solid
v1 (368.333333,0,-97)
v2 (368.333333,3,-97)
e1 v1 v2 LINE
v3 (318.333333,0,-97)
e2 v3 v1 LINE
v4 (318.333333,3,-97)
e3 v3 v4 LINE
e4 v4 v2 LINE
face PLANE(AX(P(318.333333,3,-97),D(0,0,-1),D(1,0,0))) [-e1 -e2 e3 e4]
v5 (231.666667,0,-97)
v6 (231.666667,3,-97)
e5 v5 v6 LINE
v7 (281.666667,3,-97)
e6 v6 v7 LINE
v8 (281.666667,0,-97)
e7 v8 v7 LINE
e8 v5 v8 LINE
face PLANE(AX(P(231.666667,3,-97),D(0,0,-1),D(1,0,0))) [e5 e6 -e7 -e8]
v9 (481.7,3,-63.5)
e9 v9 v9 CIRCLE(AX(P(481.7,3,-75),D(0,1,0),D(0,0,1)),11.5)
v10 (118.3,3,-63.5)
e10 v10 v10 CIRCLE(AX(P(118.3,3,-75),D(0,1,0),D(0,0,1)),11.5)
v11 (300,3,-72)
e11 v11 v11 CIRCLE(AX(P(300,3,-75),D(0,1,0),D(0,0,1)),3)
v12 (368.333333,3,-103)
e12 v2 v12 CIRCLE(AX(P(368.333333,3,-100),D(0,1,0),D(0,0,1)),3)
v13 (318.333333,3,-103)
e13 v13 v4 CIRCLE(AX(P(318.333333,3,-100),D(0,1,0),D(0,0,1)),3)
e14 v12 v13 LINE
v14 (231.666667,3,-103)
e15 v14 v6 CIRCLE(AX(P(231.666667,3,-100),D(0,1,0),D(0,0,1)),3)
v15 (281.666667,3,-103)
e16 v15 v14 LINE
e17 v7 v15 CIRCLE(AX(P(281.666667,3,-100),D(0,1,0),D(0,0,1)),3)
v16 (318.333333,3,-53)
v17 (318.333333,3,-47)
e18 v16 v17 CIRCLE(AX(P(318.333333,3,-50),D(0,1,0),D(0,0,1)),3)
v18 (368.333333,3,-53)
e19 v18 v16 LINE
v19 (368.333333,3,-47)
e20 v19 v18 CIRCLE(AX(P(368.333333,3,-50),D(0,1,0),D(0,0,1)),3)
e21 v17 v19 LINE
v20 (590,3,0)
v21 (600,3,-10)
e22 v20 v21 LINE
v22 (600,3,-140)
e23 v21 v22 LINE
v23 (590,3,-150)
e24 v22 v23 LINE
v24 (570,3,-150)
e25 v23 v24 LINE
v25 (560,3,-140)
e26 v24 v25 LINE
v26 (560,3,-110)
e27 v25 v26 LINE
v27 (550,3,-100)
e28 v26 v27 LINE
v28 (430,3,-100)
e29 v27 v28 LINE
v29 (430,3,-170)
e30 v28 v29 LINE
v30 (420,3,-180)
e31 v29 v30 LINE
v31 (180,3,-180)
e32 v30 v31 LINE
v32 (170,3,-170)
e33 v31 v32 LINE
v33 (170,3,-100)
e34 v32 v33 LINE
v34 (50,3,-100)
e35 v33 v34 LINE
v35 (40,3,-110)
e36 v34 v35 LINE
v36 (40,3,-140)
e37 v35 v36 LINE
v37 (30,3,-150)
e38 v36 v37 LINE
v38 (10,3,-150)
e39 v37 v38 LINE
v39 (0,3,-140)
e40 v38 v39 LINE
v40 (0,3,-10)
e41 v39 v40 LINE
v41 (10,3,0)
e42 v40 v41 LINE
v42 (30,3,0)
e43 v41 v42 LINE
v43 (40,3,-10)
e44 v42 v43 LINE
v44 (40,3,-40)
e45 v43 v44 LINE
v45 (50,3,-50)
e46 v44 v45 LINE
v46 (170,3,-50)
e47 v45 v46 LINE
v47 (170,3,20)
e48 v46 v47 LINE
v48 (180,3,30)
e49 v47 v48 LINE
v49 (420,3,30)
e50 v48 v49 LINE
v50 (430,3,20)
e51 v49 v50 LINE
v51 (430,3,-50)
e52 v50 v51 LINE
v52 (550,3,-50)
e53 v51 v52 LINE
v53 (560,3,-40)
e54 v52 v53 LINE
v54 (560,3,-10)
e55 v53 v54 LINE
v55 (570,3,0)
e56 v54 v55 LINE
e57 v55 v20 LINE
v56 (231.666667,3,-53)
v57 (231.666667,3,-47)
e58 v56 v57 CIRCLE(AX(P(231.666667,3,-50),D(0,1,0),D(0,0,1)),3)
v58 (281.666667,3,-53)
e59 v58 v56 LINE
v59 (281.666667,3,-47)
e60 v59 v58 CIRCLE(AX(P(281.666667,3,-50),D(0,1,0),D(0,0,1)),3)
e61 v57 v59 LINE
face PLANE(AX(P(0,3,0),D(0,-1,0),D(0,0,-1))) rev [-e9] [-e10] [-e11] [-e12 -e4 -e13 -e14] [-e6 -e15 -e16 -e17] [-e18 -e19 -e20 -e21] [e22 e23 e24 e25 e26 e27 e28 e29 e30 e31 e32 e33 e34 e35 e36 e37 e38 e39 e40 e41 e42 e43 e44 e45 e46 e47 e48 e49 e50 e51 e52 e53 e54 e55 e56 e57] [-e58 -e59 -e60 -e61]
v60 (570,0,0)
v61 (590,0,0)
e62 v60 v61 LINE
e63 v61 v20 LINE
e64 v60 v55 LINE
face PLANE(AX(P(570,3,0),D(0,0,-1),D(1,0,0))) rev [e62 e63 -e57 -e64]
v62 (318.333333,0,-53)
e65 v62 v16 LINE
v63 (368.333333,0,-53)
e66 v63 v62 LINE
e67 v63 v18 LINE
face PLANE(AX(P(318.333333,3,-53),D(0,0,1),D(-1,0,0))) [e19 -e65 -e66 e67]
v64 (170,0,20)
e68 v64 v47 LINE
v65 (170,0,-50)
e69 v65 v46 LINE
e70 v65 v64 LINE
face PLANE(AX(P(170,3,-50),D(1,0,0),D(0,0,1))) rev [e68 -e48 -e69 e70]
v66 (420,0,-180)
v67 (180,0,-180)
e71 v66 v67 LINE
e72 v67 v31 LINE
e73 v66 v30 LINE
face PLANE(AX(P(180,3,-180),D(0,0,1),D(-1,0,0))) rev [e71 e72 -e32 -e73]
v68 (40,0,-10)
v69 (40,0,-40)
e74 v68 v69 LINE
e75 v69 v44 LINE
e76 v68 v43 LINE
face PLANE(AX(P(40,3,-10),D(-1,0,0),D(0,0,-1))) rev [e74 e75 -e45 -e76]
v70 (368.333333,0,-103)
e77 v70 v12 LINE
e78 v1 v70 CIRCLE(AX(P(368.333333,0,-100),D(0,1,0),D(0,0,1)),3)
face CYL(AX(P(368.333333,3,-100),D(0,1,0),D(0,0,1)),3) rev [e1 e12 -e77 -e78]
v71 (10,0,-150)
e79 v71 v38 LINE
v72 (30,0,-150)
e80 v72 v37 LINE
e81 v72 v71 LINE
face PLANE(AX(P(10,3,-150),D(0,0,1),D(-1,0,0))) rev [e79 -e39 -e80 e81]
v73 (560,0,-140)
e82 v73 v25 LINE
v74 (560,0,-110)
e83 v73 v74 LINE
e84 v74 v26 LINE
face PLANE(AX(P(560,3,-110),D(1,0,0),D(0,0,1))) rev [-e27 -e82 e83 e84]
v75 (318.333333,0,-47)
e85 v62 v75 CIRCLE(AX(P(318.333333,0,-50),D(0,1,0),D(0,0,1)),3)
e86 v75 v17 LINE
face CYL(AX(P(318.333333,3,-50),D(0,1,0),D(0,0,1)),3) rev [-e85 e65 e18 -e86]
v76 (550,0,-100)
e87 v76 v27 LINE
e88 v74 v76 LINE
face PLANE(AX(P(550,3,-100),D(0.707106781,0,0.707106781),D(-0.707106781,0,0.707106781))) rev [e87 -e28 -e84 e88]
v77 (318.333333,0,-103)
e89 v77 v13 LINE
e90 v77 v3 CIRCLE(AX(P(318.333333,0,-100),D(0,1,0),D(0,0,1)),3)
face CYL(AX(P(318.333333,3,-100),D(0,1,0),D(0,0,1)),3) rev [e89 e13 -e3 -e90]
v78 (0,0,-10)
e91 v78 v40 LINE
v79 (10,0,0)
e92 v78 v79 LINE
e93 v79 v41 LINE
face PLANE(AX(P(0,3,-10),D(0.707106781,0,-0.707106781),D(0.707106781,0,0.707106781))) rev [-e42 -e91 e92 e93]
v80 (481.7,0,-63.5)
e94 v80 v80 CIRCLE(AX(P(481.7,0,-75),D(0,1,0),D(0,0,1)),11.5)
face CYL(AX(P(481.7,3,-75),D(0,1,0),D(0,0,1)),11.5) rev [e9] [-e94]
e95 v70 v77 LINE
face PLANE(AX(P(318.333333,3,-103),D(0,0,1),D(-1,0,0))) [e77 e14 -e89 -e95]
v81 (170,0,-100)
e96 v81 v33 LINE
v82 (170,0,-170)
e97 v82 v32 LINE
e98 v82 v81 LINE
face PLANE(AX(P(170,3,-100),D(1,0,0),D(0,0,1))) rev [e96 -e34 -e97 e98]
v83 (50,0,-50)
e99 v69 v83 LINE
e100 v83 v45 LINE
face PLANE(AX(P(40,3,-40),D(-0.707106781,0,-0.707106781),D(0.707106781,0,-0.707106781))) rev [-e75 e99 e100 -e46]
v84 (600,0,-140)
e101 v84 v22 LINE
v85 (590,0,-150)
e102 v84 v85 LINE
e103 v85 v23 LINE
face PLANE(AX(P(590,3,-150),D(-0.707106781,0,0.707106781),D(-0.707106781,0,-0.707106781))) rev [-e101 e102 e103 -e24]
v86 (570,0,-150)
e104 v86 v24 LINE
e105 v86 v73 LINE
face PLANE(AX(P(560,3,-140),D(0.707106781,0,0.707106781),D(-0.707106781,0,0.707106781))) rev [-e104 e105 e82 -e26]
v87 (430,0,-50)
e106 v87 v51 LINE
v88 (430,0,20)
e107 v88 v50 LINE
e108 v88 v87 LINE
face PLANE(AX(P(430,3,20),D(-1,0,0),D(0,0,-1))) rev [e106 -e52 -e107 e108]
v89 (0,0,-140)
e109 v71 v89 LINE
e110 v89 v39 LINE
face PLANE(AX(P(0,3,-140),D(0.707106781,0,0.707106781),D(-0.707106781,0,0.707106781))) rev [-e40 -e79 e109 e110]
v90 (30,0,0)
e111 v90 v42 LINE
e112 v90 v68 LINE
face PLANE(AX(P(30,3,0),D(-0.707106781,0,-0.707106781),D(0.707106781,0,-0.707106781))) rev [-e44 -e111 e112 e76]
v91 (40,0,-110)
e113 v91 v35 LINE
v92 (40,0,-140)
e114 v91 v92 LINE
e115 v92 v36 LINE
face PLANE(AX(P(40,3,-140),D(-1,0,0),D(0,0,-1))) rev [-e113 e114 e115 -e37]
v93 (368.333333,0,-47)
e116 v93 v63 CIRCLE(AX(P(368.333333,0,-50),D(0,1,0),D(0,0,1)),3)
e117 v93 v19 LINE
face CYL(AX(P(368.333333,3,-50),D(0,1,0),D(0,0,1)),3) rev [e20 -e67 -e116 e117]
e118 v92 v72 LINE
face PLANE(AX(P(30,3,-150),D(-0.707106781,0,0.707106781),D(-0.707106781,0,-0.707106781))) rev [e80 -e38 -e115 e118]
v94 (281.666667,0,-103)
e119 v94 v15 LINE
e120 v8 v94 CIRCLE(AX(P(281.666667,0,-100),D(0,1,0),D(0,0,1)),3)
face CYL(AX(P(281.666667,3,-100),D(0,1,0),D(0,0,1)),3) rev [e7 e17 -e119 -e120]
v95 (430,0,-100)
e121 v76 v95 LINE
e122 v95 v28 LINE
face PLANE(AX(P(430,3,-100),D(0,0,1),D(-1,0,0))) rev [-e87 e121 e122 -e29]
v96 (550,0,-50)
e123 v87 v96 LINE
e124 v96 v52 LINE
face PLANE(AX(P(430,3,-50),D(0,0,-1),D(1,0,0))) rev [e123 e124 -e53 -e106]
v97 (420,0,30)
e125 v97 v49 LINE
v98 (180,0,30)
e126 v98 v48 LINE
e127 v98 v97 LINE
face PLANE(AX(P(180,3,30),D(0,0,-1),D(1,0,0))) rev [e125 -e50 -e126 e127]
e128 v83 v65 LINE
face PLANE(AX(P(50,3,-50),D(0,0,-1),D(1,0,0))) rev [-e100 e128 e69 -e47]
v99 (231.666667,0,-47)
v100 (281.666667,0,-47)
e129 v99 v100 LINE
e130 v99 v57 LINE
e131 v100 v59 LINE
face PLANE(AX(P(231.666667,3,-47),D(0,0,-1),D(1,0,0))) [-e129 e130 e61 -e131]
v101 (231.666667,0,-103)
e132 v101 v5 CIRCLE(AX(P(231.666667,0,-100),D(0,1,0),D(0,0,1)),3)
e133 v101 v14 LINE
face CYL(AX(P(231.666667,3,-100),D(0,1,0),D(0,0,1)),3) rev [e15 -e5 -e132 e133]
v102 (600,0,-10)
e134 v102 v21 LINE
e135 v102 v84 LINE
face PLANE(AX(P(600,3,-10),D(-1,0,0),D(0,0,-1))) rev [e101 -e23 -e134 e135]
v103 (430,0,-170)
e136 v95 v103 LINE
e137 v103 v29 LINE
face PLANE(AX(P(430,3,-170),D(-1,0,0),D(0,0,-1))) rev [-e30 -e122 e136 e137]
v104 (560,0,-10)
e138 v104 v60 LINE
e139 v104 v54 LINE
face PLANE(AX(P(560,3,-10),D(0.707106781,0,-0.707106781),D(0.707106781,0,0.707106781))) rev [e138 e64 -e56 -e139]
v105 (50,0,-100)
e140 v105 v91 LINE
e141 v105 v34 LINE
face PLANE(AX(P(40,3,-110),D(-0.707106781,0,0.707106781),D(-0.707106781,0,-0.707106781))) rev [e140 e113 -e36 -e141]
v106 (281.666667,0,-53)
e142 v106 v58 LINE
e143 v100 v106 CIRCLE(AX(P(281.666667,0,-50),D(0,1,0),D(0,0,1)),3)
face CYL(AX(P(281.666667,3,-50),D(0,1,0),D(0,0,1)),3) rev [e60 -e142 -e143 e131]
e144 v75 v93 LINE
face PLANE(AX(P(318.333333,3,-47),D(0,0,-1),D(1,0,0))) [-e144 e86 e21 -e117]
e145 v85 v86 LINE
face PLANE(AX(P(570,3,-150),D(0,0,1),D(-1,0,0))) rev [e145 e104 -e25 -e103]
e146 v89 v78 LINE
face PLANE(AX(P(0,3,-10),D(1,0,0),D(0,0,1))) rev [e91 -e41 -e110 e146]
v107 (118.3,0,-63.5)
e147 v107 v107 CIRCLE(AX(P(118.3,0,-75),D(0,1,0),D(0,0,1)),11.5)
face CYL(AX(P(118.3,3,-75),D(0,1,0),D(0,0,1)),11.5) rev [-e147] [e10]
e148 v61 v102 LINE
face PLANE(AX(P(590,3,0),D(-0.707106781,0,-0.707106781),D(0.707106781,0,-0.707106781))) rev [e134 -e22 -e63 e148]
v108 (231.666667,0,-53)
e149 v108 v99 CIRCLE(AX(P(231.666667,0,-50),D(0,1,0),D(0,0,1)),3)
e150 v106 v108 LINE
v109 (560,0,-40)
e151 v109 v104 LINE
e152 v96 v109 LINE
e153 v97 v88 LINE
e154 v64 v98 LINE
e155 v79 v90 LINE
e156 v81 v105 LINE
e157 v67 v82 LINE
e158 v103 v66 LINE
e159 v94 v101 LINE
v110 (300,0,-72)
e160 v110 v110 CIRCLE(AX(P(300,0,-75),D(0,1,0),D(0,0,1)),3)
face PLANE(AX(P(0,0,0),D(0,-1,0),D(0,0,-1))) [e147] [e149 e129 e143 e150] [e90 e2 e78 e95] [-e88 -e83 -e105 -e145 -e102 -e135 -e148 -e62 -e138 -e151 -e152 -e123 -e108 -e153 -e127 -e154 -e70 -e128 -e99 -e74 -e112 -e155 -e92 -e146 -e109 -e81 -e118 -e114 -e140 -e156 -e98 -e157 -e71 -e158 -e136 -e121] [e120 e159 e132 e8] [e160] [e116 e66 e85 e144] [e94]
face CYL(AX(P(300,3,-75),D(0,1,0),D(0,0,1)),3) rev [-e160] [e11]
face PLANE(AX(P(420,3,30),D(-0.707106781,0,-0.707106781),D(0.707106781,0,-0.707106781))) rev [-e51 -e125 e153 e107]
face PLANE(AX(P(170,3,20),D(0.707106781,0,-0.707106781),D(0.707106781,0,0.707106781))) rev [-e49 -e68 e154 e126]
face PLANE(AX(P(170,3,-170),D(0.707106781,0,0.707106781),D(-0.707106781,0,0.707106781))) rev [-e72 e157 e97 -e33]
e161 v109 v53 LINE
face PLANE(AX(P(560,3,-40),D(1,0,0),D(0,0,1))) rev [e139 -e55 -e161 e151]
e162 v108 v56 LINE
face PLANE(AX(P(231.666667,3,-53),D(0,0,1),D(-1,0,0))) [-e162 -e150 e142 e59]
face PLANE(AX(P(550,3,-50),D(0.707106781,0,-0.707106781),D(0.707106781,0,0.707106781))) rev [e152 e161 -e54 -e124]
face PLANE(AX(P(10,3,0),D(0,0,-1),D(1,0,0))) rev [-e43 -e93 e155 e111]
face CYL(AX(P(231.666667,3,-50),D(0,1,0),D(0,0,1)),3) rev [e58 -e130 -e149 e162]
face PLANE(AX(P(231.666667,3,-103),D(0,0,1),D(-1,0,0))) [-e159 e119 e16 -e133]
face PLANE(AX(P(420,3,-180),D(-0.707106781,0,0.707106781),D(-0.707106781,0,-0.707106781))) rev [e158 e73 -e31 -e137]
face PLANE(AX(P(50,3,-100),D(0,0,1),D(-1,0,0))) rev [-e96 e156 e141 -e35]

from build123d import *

# Parameters (mm, degrees)
SKETCH1_R           = 11.5
SKETCH1_R_2         = 3
BOSS_EXTRUDE1_DEPTH = 3


with BuildPart() as part:
    # Sketch1 → Boss-Extrude1 (new body)
    with BuildSketch(Plane(origin=(0, 0, 0), x_dir=(1, 0, 0), z_dir=(0, 1, 0))):
        Polygon((10, 150), (30, 150), (40, 140), (40, 110), (50, 100), (170, 100), (170, 170), (180, 180), (420, 180), (430, 170), (430, 100), (550, 100), (560, 110), (560, 140), (570, 150), (590, 150), (600, 140), (600, 10), (590, 0), (570, 0), (560, 10), (560, 40), (550, 50), (430, 50), (430, -20), (420, -30), (180, -30), (170, -20), (170, 50), (50, 50), (40, 40), (40, 10), (30, 0), (10, 0), (0, 10), (0, 140), align=None)
        with Locations(Location((118.3, 75, 0), (0, 0, 270))):
            Circle(SKETCH1_R, mode=Mode.SUBTRACT)
        with Locations(Location((481.7, 75, 0), (0, 0, 270))):
            Circle(SKETCH1_R, mode=Mode.SUBTRACT)
        with Locations(Location((300, 75, 0), (0, 0, 270))):
            Circle(SKETCH1_R_2, mode=Mode.SUBTRACT)
        with BuildLine():
            Line((231.666666667, 103), (281.666666667, 103))
            ThreePointArc((281.666666667, 103), (284.666666667, 100), (281.666666667, 97))
            Line((281.666666667, 97), (231.666666667, 97))
            ThreePointArc((231.666666667, 97), (228.666666667, 100), (231.666666667, 103))
        make_face(mode=Mode.SUBTRACT)
        with BuildLine():
            Line((318.333333333, 103), (368.333333333, 103))
            ThreePointArc((368.333333333, 103), (371.333333333, 100), (368.333333333, 97))
            Line((368.333333333, 97), (318.333333333, 97))
            ThreePointArc((318.333333333, 97), (315.333333333, 100), (318.333333333, 103))
        make_face(mode=Mode.SUBTRACT)
        with BuildLine():
            Line((231.666666667, 53), (281.666666667, 53))
            ThreePointArc((281.666666667, 53), (284.666666667, 50), (281.666666667, 47))
            Line((281.666666667, 47), (231.666666667, 47))
            ThreePointArc((231.666666667, 47), (228.666666667, 50), (231.666666667, 53))
        make_face(mode=Mode.SUBTRACT)
        with BuildLine():
            Line((318.333333333, 53), (368.333333333, 53))
            ThreePointArc((368.333333333, 53), (371.333333333, 50), (368.333333333, 47))
            Line((368.333333333, 47), (318.333333333, 47))
            ThreePointArc((318.333333333, 47), (315.333333333, 50), (318.333333333, 53))
        make_face(mode=Mode.SUBTRACT)
    extrude(amount=BOSS_EXTRUDE1_DEPTH)


solid = part.part
